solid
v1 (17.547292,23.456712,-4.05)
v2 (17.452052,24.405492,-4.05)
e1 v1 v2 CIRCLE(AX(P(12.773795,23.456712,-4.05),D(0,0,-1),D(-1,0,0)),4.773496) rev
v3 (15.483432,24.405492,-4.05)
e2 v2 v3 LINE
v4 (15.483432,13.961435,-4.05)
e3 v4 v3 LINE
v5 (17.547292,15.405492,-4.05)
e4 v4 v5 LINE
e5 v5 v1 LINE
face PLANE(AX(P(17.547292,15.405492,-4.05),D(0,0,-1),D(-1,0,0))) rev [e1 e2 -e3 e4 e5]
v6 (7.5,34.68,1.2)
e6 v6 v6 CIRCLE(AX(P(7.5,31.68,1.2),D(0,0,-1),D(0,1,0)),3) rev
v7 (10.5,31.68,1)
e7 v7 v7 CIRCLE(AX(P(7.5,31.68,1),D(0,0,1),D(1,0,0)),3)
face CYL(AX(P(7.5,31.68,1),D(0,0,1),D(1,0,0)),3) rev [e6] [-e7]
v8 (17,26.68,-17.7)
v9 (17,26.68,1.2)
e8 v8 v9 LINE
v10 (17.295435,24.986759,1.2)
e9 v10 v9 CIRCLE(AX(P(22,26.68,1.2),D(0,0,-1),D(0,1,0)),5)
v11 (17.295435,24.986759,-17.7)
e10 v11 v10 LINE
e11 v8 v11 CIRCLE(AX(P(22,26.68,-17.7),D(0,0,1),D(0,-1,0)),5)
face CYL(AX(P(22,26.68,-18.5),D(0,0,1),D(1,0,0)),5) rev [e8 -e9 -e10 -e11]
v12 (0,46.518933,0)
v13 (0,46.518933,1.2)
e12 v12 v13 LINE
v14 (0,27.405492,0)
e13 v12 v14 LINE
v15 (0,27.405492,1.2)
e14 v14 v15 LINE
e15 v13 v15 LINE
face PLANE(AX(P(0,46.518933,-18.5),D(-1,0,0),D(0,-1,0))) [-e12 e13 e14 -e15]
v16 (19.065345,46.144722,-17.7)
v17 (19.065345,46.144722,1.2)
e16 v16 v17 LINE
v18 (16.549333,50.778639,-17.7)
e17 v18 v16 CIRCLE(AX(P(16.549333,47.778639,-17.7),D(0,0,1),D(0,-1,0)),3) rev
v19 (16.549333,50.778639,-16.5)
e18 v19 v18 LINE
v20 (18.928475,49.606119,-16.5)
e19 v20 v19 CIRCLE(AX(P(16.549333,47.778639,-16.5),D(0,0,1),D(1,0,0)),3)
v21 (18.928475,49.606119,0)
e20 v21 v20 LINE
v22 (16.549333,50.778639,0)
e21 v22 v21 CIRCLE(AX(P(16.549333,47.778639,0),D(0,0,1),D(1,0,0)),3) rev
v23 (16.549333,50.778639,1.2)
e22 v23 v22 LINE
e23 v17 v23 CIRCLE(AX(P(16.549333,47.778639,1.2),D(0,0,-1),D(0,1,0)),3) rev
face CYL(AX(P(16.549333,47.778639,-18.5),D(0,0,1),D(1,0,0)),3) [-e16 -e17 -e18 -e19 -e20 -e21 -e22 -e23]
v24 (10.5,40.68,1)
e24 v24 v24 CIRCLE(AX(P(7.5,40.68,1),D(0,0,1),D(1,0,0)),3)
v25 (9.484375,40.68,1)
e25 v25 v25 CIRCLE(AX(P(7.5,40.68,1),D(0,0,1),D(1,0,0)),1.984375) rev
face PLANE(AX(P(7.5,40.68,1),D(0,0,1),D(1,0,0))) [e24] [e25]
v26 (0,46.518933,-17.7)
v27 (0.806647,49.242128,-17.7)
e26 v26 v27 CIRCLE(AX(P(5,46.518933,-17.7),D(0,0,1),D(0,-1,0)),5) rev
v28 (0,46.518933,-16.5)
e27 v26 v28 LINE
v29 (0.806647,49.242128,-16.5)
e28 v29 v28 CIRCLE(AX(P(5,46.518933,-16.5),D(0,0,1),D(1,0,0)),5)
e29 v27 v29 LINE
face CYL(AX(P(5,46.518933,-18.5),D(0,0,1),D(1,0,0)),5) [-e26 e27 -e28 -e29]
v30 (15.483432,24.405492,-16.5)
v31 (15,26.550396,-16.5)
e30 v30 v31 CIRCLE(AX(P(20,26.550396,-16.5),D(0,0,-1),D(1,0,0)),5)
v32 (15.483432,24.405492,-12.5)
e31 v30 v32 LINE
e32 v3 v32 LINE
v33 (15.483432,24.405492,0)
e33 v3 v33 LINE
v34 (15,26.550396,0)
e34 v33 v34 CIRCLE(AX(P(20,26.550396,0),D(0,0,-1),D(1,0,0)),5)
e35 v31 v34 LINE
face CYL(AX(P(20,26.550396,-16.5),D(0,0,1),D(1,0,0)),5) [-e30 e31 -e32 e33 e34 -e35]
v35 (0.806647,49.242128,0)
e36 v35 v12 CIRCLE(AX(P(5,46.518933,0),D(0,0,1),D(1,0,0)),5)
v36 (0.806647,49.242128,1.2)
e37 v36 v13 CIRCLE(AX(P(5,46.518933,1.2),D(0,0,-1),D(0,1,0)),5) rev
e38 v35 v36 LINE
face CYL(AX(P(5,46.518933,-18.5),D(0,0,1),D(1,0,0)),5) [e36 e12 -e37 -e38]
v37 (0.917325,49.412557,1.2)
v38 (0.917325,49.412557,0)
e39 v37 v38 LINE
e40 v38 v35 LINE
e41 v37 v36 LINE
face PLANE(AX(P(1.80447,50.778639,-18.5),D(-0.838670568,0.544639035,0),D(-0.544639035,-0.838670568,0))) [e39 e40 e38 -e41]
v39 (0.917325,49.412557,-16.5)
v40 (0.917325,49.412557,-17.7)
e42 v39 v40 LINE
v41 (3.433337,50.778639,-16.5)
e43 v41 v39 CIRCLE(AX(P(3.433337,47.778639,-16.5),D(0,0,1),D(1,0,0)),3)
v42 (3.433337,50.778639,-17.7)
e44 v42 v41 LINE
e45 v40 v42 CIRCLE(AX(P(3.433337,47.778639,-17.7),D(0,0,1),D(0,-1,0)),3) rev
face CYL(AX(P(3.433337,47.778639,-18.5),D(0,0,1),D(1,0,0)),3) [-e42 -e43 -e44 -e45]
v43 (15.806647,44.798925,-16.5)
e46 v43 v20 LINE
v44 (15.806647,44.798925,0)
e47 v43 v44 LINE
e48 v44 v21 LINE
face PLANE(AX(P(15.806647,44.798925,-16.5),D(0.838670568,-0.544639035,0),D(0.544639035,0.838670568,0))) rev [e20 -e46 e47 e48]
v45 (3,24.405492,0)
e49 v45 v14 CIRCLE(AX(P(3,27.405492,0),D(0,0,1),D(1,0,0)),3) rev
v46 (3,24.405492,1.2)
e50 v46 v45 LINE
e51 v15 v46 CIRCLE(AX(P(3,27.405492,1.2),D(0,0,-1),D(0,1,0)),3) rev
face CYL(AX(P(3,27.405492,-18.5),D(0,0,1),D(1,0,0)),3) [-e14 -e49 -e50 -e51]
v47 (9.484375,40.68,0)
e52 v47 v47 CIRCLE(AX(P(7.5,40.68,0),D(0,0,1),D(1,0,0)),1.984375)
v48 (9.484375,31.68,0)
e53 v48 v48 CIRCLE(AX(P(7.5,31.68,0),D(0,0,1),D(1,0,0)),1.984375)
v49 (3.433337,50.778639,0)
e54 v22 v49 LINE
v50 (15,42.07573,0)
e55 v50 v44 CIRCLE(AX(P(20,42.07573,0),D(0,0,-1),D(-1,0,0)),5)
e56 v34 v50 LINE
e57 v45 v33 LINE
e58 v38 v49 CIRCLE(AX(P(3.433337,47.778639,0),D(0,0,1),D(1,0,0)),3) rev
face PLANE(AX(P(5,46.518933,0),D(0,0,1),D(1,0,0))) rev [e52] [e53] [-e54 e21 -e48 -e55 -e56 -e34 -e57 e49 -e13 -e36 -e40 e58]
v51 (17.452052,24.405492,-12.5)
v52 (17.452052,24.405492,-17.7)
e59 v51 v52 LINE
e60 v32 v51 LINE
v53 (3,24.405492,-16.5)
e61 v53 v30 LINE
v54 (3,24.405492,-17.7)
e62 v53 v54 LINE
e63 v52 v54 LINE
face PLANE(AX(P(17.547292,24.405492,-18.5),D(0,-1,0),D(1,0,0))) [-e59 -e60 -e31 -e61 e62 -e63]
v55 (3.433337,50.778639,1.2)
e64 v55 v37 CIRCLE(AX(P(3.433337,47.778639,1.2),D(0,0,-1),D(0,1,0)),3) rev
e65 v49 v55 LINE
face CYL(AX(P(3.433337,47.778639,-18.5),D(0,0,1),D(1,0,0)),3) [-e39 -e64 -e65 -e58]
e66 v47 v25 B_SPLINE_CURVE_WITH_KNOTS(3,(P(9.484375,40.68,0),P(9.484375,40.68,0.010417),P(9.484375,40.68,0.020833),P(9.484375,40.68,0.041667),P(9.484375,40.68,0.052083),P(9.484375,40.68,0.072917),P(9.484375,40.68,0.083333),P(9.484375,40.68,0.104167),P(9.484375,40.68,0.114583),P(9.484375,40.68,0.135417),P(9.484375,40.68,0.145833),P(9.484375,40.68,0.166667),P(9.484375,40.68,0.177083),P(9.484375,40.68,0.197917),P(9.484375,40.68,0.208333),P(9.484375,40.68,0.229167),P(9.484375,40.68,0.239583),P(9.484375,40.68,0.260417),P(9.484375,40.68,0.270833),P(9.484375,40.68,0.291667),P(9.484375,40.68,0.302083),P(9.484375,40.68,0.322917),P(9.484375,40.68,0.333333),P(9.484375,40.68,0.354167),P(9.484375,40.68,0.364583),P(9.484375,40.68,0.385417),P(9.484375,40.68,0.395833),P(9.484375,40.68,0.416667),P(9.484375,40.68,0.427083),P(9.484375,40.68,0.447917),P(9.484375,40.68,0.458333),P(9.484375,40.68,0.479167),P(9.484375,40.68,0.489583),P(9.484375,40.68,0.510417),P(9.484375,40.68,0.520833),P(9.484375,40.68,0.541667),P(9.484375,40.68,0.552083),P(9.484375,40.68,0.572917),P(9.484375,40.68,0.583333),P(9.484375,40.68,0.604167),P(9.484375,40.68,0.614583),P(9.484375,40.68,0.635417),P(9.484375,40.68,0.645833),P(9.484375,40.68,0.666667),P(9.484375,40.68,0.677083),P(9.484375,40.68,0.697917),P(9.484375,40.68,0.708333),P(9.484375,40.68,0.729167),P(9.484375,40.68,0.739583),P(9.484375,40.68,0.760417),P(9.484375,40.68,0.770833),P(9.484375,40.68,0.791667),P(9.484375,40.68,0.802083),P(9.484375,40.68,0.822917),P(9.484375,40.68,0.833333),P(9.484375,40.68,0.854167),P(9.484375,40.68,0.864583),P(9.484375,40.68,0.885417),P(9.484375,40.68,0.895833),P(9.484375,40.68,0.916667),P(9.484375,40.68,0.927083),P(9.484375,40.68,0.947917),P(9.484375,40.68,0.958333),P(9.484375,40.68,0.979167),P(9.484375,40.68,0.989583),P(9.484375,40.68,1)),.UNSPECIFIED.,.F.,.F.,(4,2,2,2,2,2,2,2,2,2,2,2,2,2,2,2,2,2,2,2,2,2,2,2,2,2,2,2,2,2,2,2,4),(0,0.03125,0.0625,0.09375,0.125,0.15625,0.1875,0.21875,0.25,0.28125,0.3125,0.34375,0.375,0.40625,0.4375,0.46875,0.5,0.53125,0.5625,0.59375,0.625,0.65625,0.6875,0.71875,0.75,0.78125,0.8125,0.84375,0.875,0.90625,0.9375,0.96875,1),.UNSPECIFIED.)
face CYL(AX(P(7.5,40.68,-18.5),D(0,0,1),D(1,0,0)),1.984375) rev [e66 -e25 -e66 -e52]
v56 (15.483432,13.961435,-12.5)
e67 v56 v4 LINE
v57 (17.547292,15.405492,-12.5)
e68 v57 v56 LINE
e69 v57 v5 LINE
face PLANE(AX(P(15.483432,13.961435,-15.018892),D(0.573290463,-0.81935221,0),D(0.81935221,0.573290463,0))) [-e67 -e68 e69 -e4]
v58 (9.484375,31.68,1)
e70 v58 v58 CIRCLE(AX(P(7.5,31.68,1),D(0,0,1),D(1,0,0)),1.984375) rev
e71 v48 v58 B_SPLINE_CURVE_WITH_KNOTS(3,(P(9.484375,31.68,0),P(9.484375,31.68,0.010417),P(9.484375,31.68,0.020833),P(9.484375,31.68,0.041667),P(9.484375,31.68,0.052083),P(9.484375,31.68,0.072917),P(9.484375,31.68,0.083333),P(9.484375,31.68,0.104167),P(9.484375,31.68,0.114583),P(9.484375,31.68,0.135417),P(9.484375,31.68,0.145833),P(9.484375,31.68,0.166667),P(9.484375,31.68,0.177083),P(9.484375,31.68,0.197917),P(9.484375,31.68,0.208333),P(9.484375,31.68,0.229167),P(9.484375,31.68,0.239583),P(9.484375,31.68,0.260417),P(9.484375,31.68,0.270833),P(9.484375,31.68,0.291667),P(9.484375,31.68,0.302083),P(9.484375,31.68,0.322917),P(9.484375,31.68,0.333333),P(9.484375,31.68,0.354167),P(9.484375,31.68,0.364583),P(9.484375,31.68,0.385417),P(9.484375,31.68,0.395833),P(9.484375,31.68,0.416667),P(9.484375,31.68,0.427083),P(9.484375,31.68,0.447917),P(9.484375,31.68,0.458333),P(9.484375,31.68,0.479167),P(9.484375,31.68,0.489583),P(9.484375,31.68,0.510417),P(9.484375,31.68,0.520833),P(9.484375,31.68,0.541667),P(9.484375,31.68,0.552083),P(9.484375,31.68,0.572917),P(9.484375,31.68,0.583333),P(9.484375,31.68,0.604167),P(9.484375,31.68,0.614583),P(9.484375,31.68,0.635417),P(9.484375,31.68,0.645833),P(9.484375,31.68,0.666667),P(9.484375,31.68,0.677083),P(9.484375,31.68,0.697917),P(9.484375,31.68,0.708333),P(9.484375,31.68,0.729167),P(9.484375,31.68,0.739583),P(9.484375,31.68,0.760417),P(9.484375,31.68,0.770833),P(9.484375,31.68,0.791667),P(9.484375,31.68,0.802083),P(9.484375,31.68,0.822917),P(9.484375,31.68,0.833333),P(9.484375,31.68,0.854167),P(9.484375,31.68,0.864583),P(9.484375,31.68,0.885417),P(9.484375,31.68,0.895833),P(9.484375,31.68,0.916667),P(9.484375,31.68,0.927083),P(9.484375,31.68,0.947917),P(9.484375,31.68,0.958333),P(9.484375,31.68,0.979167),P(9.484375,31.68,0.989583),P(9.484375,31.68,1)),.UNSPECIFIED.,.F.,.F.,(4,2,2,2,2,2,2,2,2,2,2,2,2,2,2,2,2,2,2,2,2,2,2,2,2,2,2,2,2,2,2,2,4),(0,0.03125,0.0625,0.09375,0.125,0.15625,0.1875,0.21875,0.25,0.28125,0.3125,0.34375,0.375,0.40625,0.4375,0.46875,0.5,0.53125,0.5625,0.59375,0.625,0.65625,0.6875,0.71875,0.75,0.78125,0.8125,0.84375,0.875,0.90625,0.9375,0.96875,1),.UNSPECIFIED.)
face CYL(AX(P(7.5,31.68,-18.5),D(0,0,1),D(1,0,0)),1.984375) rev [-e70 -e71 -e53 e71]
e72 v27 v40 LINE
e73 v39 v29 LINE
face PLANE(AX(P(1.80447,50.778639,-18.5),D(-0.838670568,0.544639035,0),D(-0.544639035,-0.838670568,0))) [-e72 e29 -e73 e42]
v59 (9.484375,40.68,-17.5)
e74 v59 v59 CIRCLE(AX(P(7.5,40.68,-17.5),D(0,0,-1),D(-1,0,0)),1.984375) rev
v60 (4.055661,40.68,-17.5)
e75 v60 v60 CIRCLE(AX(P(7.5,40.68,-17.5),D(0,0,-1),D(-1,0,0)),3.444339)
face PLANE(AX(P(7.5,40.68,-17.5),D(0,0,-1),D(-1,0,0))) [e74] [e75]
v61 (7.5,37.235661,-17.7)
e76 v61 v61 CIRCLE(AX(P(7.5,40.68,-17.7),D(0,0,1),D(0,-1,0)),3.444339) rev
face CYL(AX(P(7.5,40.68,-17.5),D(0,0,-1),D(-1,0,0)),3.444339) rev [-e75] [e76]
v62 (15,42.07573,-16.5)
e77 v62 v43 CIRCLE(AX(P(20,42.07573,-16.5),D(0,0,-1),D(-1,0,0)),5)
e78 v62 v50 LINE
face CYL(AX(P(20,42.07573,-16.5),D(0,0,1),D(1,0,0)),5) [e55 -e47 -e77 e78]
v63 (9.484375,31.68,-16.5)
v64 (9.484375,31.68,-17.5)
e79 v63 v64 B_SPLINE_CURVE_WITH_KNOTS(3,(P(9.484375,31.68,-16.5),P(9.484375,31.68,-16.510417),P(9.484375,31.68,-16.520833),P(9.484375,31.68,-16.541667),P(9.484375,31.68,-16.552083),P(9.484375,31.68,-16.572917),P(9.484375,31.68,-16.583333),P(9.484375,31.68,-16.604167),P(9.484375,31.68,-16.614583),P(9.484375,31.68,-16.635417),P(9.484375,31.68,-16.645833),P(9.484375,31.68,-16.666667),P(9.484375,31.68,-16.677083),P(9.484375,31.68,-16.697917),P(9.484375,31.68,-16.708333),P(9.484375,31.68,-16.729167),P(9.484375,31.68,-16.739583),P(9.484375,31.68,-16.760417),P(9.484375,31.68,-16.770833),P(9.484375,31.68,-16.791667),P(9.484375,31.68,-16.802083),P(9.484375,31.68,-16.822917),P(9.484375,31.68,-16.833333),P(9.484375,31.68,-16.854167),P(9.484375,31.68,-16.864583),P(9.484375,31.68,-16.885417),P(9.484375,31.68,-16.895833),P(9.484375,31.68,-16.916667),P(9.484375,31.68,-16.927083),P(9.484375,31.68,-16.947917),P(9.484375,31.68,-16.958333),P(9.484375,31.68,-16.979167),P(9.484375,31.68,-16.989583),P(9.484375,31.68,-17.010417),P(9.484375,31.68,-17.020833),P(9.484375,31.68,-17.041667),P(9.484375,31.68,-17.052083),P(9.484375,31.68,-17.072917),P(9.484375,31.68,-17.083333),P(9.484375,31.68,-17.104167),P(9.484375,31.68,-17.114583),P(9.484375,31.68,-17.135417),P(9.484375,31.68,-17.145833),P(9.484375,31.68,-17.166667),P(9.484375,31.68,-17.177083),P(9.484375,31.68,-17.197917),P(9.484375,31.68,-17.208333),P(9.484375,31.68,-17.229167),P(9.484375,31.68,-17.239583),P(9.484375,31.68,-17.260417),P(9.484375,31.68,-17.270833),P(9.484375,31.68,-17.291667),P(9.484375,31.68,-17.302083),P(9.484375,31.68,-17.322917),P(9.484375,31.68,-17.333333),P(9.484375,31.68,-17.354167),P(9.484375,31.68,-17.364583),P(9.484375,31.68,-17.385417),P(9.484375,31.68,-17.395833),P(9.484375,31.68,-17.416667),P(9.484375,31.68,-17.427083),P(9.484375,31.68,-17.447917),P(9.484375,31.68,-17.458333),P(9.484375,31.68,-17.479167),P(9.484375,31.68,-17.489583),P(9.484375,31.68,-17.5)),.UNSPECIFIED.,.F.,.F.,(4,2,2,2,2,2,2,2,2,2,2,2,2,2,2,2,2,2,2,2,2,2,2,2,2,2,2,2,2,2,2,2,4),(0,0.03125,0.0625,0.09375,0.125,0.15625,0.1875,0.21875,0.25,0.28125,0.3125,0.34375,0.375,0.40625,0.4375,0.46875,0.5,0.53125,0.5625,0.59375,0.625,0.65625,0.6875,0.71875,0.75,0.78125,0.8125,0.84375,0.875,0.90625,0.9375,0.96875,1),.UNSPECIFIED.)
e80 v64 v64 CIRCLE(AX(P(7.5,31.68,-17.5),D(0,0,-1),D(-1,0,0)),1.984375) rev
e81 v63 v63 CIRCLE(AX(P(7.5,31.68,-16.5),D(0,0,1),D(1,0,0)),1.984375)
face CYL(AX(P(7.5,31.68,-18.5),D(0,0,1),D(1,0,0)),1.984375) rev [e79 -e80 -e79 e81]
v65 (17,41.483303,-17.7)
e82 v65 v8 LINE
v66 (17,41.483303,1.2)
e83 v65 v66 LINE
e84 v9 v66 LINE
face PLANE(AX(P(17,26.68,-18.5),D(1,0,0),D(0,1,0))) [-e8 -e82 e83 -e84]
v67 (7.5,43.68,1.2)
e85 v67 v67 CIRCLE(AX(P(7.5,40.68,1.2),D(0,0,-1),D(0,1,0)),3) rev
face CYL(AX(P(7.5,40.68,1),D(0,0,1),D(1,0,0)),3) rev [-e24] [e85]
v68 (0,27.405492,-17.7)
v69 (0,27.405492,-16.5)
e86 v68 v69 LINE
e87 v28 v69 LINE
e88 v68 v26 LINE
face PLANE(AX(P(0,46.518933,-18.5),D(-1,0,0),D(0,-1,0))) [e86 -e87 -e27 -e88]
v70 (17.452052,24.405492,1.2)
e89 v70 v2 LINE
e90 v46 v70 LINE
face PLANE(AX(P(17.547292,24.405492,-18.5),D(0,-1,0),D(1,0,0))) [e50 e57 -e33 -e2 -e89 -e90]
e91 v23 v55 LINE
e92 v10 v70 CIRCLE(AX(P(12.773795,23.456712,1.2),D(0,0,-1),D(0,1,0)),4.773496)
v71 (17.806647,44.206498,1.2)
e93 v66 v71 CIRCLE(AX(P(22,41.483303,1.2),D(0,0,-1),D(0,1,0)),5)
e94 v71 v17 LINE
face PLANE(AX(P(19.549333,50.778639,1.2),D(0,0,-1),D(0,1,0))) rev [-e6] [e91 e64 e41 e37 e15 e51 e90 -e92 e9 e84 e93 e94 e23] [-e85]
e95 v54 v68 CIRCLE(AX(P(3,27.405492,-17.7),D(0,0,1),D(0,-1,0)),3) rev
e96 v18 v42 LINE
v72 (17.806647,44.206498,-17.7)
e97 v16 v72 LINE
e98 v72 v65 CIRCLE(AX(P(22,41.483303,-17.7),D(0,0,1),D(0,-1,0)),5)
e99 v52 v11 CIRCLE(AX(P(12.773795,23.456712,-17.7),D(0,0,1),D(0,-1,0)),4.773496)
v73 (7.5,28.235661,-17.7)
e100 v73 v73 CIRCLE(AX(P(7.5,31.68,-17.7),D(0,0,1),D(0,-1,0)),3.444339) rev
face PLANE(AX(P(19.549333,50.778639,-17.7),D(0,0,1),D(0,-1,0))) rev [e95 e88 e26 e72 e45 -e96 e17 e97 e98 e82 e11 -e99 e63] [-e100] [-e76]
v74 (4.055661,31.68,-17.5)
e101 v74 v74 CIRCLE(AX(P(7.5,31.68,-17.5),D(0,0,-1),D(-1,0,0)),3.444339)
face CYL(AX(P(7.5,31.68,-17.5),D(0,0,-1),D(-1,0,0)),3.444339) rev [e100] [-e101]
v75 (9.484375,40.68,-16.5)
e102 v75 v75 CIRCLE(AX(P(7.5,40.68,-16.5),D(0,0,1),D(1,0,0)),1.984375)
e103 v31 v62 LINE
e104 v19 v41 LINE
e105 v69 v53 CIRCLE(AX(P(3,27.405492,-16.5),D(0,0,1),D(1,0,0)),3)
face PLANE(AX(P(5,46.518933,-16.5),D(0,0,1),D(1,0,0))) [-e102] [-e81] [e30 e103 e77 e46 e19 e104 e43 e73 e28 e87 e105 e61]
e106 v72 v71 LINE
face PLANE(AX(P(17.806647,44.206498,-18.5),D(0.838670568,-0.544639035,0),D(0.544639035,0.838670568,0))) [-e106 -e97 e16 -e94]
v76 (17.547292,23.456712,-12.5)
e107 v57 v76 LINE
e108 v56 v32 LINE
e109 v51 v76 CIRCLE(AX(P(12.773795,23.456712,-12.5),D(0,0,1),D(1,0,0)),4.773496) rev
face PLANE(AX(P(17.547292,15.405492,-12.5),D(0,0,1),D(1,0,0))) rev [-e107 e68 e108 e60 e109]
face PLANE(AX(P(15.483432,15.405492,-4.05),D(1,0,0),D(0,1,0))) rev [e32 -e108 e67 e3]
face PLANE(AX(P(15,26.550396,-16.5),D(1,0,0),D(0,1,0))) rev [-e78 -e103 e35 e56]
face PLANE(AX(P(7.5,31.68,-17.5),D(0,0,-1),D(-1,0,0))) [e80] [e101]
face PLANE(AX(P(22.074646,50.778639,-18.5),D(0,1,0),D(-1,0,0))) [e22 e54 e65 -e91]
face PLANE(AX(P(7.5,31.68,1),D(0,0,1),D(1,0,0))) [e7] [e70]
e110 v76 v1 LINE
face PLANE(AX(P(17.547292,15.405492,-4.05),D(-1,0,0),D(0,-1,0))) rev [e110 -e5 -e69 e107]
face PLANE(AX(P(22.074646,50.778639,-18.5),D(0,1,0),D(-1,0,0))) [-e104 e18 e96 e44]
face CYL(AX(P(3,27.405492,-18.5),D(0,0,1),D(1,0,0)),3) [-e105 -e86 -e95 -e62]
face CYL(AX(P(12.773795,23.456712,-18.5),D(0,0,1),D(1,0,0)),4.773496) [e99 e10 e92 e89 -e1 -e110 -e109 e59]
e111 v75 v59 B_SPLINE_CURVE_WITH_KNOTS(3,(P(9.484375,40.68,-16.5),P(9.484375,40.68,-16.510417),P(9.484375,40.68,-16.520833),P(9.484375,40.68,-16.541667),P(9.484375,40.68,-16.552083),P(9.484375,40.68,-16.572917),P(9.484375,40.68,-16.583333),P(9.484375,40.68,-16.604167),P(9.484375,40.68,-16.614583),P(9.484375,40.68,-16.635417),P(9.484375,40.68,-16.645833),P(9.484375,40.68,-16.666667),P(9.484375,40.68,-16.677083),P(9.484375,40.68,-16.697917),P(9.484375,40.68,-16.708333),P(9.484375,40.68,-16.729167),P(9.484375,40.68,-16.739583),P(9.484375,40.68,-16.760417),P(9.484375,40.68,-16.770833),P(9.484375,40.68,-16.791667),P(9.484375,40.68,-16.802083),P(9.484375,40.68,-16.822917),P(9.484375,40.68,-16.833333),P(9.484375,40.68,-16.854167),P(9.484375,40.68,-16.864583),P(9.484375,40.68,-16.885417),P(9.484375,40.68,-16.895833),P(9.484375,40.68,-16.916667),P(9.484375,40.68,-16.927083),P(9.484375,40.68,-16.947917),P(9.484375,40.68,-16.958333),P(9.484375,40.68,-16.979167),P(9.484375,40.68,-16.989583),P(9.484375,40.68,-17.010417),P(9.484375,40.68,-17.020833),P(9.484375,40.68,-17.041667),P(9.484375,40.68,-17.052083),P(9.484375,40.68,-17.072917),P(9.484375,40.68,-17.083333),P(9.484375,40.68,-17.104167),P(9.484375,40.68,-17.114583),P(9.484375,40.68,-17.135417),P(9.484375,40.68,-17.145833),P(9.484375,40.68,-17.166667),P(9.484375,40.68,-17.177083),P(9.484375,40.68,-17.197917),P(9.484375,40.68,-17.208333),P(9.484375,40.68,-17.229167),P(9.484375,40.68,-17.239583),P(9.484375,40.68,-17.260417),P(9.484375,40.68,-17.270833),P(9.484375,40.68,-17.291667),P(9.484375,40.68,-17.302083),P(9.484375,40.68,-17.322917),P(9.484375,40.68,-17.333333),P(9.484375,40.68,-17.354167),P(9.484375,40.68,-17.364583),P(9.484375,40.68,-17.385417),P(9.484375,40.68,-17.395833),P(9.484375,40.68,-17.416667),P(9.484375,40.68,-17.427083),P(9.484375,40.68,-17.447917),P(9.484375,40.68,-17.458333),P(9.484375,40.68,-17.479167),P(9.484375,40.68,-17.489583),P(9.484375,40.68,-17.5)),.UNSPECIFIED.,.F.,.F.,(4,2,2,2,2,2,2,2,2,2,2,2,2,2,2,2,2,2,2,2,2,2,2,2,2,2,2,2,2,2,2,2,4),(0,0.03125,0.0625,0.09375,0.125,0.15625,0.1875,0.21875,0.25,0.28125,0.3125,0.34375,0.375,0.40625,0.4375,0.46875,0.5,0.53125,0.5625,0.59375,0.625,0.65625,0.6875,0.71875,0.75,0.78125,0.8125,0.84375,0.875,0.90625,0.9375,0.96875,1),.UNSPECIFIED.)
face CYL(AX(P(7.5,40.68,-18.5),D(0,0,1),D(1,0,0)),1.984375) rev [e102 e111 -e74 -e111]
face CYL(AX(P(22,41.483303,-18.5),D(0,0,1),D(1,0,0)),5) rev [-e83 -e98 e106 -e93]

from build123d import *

# Parameters (mm, degrees)
BOSS_EXTRUDE1_START = 2
BOSS_EXTRUDE1_DEPTH = 20.5
CUT_EXTRUDE1_DEPTH  = 8.25
SKETCH4_R           = 1.984375
CUT_EXTRUDE2_DEPTH  = 60.042444086
SKETCH5_R           = 3
CUT_EXTRUDE3_DEPTH  = 1
SKETCH6_R           = 3.444339348
CUT_EXTRUDE4_DEPTH  = 1
FILLET1_R           = 3
SKETCH9_W           = 2.063859561
SKETCH9_H           = 8.45
BOSS_EXTRUDE4_DEPTH = 9
BOSS_EXTRUDE5_DEPTH = 8.45
CUT_EXTRUDE5_DEPTH  = 59.145478277
FILLET3_R           = 3
SKETCH12_W          = 4.417525097
SKETCH12_H          = 36.817204543
CUT_EXTRUDE6_DEPTH  = 58.470832985


with BuildPart() as part:
    # Sketch1 → Boss-Extrude1 (new body)
    with BuildSketch(Plane.XY.offset(BOSS_EXTRUDE1_START)):
        with BuildLine():
            Line((17, 26.68), (17, 41.483303111))
            ThreePointArc((17, 41.483303111), (17.205901326, 42.903379834), (17.80664716, 44.206498286))
            Line((17.80664716, 44.206498286), (22.074645554, 50.778639479))
            Line((22.074645554, 50.778639479), (1.804469576, 50.778639479))
            Line((1.804469576, 50.778639479), (0.80664716, 49.2421277))
            ThreePointArc((0.80664716, 49.2421277), (0.205901326, 47.939009249), (0, 46.518932525))
            Line((0, 46.518932525), (0, 24.405491581))
            Line((0, 24.405491581), (17.547291672, 24.405491581))
            ThreePointArc((17.547291672, 24.405491581), (17.138748019, 25.51028671), (17, 26.68))
        make_face()
    extrude(amount=-BOSS_EXTRUDE1_DEPTH)

    # Sketch2 → Cut-Extrude1 (cut, symmetric)
    with BuildSketch(Plane.XY.offset(-8.25)):
        with BuildLine():
            Line((1.804469576, 50.778639479), (0.80664716, 49.2421277))
            ThreePointArc((0.80664716, 49.2421277), (0.205901326, 47.939009249), (0, 46.518932525))
            Line((0, 46.518932525), (0, 24.405491581))
            Line((0, 24.405491581), (15.483432111, 24.405491581))
            ThreePointArc((15.483432111, 24.405491581), (15.122355105, 25.45104141), (15, 26.550395893))
            Line((15, 26.550395893), (15, 42.075730101))
            ThreePointArc((15, 42.075730101), (15.205901326, 43.495806824), (15.80664716, 44.798925276))
            Line((15.80664716, 44.798925276), (19.689918969, 50.778639479))
            Line((19.689918969, 50.778639479), (1.804469576, 50.778639479))
        make_face()
    extrude(amount=CUT_EXTRUDE1_DEPTH, both=True, mode=Mode.SUBTRACT)

    # Sketch4 → Cut-Extrude2 (cut, through all)
    with BuildSketch(Plane.XY.offset(2)):
        with Locations((7.5, 40.68)):
            Circle(SKETCH4_R)
        with Locations((7.5, 31.68)):
            Circle(SKETCH4_R)
    extrude(amount=-CUT_EXTRUDE2_DEPTH, mode=Mode.SUBTRACT)

    # Sketch5 → Cut-Extrude3 (cut)
    with BuildSketch(Plane.XY.offset(2)):
        with Locations((7.5, 40.68)):
            Circle(SKETCH5_R)
        with Locations((7.5, 31.68)):
            Circle(SKETCH5_R)
    extrude(amount=-CUT_EXTRUDE3_DEPTH, mode=Mode.SUBTRACT)

    # Sketch6 → Cut-Extrude4 (cut)
    with BuildSketch(Plane(origin=(0, 0, -18.5), x_dir=(-1, 0, 0), z_dir=(0, 0, -1))):
        with Locations((-7.5, 40.68)):
            Circle(SKETCH6_R)
        with Locations((-7.5, 31.68)):
            Circle(SKETCH6_R)
    extrude(amount=-CUT_EXTRUDE4_DEPTH, mode=Mode.SUBTRACT)

    # Fillet1
    # the kernel refuses this fillet: 3 mm, written as the material it takes off along each edge
    with BuildSketch(Plane(origin=(22.074645554, 50.778639479, 15.813281645), x_dir=(-0.5446390350150283, -0.8386705679454232, 0), z_dir=(0, 0, -1))) as fillet1_piece_1:
        with BuildLine():
            CenterArc((FILLET1_R * 1.84177088603, FILLET1_R), FILLET1_R, 147, 123)
            Line((FILLET1_R * 1.00310031809, FILLET1_R * 1.54463903502), (0, 0))
            Line((0, 0), (FILLET1_R * 1.84177088603, 0))
        make_face()
    extrude(amount=48.126563291, mode=Mode.SUBTRACT)

    # Sketch9 → Boss-Extrude4 (add)
    with BuildSketch(Plane(origin=(0, 24.405491581, 0), x_dir=(-1, 0, 0), z_dir=(0, -1, 0))):
        with Locations((-16.515361891, 8.275)):
            Rectangle(SKETCH9_W, SKETCH9_H)
    extrude(amount=BOSS_EXTRUDE4_DEPTH)

    # Sketch10 → Boss-Extrude5 (add)
    with BuildSketch(Plane.XY.offset(-4.05)):
        Polygon((15.483432111, 15.405491581), (15.483432111, 13.961434936), (17.547291672, 15.405491581), align=None)
    extrude(amount=-BOSS_EXTRUDE5_DEPTH)

    # Sketch11 → Cut-Extrude5 (cut, through all)
    with BuildSketch(Plane.XY.offset(2)):
        with BuildLine():
            Line((17.264521068, 25.075244788), (17.547291672, 25.075244788))
            Line((17.547291672, 25.075244788), (17.547291672, 23.456711585))
            ThreePointArc((17.547291672, 23.456711585), (17.476067665, 24.278235922), (17.264521068, 25.075244788))
        make_face()
    extrude(amount=-CUT_EXTRUDE5_DEPTH, mode=Mode.SUBTRACT)

    # Fillet3
    fillet3_edges = [part.edges().sort_by_distance(p)[0] for p in [
        (0, 24.405491581, -17.5),
        (1.804469576, 50.778639479, -17.5),
        (1.804469576, 50.778639479, 1),
        (0, 24.405491581, 1),
    ]]
    fillet(fillet3_edges, radius=FILLET3_R)

    # Sketch12 → Cut-Extrude6 (cut, through all)
    with BuildSketch(Plane.ZY):
        with Locations((-19.908762549, 32.370037208)):
            Rectangle(SKETCH12_W, SKETCH12_H)
        with Locations((3.408762549, 32.370037208)):
            Rectangle(SKETCH12_W, SKETCH12_H)
    extrude(amount=-CUT_EXTRUDE6_DEPTH, mode=Mode.SUBTRACT)


solid = part.part
